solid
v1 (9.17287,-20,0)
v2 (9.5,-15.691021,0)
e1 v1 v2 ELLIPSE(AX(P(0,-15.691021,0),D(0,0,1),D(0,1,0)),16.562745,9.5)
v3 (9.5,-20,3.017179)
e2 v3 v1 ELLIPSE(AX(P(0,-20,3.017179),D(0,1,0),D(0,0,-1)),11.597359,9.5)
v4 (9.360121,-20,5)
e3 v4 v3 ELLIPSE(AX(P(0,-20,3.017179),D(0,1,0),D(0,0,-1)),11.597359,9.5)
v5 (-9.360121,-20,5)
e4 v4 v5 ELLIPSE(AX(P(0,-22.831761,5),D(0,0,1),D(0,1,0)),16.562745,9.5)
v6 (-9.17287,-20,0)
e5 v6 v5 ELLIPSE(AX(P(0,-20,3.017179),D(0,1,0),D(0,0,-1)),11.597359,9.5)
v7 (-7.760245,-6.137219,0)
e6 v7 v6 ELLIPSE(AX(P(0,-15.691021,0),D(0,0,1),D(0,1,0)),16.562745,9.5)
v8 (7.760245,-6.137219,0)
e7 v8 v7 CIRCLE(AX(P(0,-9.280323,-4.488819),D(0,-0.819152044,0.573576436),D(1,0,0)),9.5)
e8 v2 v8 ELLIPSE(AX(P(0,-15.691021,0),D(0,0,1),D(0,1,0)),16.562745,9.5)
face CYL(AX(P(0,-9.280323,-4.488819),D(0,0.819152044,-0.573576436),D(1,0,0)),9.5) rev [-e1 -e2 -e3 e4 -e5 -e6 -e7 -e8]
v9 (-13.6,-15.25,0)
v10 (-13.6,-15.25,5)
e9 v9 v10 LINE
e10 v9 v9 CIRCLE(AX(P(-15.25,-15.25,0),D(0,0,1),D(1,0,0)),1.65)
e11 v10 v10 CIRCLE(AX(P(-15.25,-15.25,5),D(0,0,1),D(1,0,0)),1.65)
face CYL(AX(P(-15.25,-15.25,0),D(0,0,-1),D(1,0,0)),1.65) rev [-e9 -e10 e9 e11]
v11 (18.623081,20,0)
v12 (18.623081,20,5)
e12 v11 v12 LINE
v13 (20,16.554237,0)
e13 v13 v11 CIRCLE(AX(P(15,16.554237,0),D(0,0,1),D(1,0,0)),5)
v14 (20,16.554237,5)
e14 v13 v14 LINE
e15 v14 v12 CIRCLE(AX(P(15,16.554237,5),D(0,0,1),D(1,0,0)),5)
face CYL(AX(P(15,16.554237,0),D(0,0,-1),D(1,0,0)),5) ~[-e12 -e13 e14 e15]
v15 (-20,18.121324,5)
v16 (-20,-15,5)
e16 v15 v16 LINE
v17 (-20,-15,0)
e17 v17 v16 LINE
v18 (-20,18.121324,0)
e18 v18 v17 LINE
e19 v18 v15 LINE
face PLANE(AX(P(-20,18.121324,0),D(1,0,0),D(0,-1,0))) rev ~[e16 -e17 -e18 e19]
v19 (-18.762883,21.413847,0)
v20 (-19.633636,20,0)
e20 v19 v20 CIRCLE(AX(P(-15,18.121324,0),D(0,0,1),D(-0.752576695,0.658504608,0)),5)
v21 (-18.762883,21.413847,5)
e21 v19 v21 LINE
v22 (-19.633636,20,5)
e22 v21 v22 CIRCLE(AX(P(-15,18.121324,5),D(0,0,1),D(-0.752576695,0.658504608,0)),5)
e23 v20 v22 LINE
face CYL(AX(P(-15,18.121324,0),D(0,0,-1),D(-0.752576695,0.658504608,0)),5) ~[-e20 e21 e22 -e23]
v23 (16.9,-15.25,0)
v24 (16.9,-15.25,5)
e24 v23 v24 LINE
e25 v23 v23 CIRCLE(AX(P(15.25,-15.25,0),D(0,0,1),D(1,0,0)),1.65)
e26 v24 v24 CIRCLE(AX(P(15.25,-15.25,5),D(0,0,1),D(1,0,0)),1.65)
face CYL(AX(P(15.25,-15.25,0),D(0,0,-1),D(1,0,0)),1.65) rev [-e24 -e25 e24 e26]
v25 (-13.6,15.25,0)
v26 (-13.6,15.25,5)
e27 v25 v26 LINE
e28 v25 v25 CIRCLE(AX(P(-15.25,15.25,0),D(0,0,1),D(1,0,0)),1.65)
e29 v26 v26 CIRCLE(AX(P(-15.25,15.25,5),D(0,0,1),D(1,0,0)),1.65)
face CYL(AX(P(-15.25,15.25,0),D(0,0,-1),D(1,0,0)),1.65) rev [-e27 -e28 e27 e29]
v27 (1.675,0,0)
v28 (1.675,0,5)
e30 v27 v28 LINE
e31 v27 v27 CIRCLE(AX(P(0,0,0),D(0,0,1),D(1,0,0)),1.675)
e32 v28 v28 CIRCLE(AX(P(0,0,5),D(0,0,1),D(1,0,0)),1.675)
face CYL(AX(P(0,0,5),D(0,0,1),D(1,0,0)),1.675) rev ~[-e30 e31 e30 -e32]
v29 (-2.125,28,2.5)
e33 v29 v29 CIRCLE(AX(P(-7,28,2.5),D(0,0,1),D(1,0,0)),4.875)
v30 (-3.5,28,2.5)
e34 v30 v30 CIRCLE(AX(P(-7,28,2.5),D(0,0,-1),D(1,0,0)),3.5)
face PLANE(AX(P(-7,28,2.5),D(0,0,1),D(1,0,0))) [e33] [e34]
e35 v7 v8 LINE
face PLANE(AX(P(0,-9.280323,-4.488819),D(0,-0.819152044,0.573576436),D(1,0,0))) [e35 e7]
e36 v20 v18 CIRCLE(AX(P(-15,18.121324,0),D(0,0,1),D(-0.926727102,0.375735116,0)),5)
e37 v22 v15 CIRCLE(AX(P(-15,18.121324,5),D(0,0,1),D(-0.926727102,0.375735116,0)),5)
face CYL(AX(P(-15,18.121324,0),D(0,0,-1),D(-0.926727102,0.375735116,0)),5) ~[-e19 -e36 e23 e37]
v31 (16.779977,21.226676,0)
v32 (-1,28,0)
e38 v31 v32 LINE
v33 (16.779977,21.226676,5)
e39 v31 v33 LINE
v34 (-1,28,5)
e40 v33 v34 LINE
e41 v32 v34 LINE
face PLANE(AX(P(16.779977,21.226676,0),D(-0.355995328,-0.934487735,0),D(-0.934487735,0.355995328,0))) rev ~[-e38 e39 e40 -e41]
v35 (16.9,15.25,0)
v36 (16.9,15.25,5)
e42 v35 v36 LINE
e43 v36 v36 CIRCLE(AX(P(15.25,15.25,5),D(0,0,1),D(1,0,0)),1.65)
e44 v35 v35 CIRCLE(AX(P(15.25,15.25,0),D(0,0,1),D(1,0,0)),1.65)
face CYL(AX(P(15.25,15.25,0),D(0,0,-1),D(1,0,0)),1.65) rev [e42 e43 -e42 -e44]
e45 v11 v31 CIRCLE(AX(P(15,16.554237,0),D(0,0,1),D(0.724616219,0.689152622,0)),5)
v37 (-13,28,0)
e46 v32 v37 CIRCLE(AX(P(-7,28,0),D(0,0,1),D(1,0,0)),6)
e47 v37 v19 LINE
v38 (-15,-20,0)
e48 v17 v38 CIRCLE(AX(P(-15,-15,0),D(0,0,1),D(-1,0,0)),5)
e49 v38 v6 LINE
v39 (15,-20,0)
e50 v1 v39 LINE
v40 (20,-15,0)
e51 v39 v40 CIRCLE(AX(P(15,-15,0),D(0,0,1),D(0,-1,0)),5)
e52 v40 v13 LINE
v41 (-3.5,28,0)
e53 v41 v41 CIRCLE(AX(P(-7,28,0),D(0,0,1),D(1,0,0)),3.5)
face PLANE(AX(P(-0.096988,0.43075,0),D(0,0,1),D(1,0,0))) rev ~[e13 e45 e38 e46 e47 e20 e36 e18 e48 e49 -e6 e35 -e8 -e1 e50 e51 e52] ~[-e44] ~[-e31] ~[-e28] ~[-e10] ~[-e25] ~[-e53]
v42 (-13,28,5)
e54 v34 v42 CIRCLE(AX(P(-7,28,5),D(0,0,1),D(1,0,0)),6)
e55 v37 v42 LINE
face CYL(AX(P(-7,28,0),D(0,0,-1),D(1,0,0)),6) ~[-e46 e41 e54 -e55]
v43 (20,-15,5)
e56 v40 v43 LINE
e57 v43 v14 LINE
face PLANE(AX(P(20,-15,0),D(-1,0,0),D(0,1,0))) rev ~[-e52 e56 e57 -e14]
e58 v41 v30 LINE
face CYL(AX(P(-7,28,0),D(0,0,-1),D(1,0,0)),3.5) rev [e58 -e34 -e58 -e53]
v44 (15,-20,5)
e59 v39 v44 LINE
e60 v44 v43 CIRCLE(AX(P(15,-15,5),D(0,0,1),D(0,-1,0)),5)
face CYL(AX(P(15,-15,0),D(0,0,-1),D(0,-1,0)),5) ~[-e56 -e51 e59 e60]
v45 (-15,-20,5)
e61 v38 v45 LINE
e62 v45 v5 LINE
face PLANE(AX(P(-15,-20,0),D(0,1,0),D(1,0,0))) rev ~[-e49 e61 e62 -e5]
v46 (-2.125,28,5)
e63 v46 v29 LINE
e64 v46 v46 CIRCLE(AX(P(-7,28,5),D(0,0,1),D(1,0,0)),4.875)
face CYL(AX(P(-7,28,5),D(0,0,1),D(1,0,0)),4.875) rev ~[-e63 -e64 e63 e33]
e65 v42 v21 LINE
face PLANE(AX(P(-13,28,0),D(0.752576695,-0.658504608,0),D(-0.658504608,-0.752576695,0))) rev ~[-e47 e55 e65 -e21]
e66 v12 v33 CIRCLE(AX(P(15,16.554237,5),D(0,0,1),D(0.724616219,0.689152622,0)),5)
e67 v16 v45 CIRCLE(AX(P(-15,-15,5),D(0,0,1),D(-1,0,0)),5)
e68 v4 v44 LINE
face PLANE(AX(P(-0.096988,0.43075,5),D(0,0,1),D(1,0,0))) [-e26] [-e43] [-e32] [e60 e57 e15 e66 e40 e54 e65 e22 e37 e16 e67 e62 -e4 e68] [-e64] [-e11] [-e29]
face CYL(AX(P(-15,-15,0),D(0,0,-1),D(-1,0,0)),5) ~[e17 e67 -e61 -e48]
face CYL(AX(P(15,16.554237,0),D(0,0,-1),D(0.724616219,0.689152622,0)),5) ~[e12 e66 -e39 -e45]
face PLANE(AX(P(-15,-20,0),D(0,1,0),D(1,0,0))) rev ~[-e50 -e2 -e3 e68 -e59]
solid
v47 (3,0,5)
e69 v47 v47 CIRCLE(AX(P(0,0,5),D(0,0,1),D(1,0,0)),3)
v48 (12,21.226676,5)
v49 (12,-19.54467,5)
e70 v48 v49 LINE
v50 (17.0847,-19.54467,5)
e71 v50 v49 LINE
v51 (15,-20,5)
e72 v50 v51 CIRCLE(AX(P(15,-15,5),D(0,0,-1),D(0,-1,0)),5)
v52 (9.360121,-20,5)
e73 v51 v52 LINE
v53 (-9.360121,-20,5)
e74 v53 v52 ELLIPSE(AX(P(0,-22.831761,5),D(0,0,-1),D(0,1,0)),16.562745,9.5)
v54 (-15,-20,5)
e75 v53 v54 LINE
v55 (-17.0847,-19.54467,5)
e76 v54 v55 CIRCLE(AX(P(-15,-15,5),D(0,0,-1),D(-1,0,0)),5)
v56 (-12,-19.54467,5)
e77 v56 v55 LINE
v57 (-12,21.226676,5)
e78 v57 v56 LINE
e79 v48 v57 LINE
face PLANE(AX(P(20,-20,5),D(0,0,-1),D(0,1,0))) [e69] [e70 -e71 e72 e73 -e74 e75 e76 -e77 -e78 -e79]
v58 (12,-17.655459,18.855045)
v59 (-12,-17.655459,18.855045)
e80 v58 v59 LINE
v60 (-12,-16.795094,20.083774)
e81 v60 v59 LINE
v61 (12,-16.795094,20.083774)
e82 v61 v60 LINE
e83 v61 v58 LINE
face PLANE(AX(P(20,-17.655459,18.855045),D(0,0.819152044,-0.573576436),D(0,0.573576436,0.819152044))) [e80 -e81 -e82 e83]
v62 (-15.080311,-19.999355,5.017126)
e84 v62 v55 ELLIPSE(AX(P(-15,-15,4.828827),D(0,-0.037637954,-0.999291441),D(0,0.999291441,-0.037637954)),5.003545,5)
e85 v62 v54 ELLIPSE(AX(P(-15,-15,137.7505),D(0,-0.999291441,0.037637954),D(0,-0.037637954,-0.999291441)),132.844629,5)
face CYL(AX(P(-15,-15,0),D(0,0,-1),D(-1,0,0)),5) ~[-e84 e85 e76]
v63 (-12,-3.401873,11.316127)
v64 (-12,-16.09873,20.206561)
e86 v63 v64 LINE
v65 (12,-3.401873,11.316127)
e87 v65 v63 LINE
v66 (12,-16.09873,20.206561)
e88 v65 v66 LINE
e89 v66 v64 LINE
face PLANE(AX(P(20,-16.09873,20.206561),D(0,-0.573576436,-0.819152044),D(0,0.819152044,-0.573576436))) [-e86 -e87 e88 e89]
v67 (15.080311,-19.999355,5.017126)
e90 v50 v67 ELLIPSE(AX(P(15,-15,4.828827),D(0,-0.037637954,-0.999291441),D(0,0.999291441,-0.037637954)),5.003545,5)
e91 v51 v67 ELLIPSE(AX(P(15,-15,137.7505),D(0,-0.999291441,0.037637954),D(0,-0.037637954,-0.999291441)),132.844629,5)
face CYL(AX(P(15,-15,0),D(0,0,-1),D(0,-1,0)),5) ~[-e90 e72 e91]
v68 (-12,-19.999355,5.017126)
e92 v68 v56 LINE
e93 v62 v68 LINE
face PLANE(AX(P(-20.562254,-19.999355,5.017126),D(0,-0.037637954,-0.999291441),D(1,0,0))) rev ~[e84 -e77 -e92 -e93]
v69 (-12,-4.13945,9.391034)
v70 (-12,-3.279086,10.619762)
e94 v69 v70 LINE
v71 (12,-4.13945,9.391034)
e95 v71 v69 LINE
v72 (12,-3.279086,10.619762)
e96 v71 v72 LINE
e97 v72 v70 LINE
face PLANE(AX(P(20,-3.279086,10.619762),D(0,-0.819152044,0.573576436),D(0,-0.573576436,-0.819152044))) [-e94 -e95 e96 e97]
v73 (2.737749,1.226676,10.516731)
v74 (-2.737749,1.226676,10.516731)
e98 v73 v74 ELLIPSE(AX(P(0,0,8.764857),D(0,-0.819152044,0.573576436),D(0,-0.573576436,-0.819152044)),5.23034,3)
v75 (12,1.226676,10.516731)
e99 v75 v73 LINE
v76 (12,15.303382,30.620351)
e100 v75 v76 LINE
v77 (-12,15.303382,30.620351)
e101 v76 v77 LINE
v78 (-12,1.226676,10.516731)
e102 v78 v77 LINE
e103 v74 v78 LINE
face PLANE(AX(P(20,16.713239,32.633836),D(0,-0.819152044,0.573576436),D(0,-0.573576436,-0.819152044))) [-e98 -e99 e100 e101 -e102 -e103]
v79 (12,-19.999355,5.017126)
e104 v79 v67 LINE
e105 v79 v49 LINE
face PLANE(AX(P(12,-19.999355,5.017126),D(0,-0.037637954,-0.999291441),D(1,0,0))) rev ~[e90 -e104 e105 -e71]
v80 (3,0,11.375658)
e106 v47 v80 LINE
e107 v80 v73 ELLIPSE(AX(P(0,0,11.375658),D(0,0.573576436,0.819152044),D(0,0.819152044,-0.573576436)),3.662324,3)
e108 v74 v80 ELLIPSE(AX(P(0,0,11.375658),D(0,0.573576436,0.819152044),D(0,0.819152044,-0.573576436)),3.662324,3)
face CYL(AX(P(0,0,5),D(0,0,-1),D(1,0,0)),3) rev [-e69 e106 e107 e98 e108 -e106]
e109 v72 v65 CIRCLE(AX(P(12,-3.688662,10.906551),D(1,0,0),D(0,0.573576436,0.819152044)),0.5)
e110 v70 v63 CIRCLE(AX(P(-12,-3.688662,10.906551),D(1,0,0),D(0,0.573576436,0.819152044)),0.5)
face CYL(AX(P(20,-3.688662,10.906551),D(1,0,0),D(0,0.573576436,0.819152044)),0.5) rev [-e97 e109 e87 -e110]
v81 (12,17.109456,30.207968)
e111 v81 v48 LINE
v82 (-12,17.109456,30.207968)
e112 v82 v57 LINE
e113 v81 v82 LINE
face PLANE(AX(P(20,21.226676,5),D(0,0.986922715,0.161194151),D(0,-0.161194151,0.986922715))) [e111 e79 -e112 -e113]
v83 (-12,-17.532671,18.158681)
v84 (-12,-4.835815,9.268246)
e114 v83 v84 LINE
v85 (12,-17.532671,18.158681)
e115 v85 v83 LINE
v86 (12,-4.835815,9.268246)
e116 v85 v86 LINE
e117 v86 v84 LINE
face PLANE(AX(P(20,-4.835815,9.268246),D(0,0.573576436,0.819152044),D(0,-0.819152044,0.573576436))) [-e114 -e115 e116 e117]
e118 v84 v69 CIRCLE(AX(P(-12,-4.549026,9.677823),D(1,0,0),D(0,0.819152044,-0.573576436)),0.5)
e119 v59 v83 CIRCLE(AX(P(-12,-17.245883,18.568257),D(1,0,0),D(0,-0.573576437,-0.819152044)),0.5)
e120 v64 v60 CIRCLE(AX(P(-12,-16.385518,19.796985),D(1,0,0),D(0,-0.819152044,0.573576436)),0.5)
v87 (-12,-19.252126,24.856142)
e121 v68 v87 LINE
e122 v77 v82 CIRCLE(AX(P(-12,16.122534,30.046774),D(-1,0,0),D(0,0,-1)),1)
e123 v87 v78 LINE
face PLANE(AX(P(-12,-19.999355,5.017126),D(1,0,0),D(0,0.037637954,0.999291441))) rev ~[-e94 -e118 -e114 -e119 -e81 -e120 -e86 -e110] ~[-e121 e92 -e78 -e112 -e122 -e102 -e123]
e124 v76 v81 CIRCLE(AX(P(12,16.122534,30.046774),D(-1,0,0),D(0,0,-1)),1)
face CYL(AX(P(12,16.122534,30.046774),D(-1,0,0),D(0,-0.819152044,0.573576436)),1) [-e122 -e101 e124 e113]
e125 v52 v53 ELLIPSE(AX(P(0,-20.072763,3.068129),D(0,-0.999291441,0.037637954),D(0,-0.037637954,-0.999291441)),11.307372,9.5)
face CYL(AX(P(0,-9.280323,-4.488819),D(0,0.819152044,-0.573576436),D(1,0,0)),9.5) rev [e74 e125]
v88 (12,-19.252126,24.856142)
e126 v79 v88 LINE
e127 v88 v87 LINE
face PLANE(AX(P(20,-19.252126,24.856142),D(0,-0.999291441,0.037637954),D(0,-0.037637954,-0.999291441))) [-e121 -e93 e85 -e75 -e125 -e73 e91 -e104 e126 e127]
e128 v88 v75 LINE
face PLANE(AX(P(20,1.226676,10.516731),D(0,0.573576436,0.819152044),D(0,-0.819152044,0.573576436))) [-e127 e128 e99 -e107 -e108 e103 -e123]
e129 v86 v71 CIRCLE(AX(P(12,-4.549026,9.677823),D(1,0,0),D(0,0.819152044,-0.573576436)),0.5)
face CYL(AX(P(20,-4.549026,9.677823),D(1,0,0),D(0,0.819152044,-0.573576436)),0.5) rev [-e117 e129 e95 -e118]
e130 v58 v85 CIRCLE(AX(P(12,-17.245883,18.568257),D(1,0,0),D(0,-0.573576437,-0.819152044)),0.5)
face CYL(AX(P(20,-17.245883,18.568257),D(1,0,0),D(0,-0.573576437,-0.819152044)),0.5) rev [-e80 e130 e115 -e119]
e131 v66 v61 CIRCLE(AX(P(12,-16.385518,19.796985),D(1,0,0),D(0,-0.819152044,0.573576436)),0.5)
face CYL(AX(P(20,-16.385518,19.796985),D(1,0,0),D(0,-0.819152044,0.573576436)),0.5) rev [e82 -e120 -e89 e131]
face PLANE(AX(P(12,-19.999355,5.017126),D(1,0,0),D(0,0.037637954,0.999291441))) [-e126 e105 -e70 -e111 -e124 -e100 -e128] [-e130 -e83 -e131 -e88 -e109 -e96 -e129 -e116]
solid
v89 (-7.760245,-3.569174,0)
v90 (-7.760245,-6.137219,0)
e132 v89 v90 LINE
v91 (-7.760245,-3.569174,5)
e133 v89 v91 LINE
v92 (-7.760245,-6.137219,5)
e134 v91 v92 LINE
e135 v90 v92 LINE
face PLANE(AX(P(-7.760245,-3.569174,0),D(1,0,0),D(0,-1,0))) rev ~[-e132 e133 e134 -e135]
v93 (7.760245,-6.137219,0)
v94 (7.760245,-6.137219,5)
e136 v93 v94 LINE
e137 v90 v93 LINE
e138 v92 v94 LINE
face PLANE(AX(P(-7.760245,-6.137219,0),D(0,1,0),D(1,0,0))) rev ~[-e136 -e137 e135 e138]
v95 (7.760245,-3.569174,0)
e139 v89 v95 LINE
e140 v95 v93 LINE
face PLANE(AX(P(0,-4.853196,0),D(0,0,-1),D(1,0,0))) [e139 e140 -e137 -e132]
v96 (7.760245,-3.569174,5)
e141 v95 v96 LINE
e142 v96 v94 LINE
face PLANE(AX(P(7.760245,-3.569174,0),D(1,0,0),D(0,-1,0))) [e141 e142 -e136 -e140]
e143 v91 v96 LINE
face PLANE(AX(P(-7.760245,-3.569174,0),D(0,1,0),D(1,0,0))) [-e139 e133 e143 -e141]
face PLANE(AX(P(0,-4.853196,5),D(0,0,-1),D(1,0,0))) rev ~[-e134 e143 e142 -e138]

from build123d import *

# Parameters (mm, degrees)
F0_R          = 1.65
F0_R_2        = 3.5
F1_DEPTH      = 5
F3_DEPTH      = 40
F4_R          = 9.5
F5_DEPTH      = 25
F6_R          = 1.675
F7_DEPTH      = 25
F7_DEPTH_BACK = 25
F8_R          = 3
F9_DEPTH      = 40
F11_DEPTH     = 40
F12_W         = 9.1582505405
F12_H         = 40
F12_W_2       = 8.5622543842
F13_DEPTH     = 50
F14_R         = 1
F15_R         = 4.875
F16_DEPTH     = 2.5
F17_W         = 15.5204893433
F17_H         = 2.5680447786
F18_DEPTH     = 5


with BuildPart() as f1:
    # F0 (on Top) → F1 (new body)
    with BuildSketch(Plane.XY):
        with BuildLine():
            Line((-15, -20), (15, -20))
            ThreePointArc((15, -20), (18.5355339059, -18.5355339059), (20, -15))
            Line((20, -15), (20, 16.5542368918))
            ThreePointArc((20, 16.5542368918), (19.643027324, 18.4095797898), (18.6230810925, 20))
            Line((18.6230810925, 20), (-19.6336355125, 20))
            ThreePointArc((-19.6336355125, 20), (-19.9075542566, 19.078356926), (-20, 18.1213244195))
            Line((-20, 18.1213244195), (-20, -15))
            ThreePointArc((-20, -15), (-18.5355339059, -18.5355339059), (-15, -20))
        make_face()
        with Locations((-15.25, -15.25)):
            Circle(F0_R, mode=Mode.SUBTRACT)
        with Locations((15.25, -15.25)):
            Circle(F0_R, mode=Mode.SUBTRACT)
        with Locations((-15.25, 15.25)):
            Circle(F0_R, mode=Mode.SUBTRACT)
        with Locations((15.25, 15.25)):
            Circle(F0_R, mode=Mode.SUBTRACT)
        with BuildLine():
            Line((-19.6336355125, 20), (18.6230810925, 20))
            ThreePointArc((18.6230810925, 20), (17.7702782254, 20.7166350653), (16.779976638, 21.2266755665))
            Line((16.779976638, 21.2266755665), (-1, 28))
            ThreePointArc((-1, 28), (-7, 22), (-13, 28))
            Line((-13, 28), (-18.7628834735, 21.4138474588))
            ThreePointArc((-18.7628834735, 21.4138474588), (-19.2573611463, 20.7433229072), (-19.6336355125, 20))
        make_face()
        with BuildLine():
            ThreePointArc((-13, 28), (-7, 22), (-1, 28))
            ThreePointArc((-1, 28), (-7, 34), (-13, 28))
        make_face()
        with Locations((-7, 28)):
            Circle(F0_R_2, mode=Mode.SUBTRACT)
    extrude(amount=F1_DEPTH)


with BuildPart() as f3:
    # F2 (on face) → F3 (new body)
    with BuildSketch(Plane.YZ.offset(20)):
        Polygon((1.2266755665, 10.51673083), (-19.2521255407, 24.8561417388), (-20, 5), (21.2266755665, 5), (16.713239348, 32.6338360258), align=None)
        with BuildLine():
            ThreePointArc((-16.7950944212, 20.0837735554), (-16.4723424879, 20.2893892137), (-16.0987301809, 20.2065613594))
            Line((-16.0987301809, 20.2065613594), (-3.4018734944, 11.3161265959))
            ThreePointArc((-3.4018734944, 11.3161265959), (-3.1962578361, 10.9933746626), (-3.2790856905, 10.6197623556))
            Line((-3.2790856905, 10.6197623556), (-4.139450345, 9.3910342892))
            ThreePointArc((-4.139450345, 9.3910342892), (-4.4622022783, 9.1854186308), (-4.8358145853, 9.2682464852))
            Line((-4.8358145853, 9.2682464852), (-17.5326712718, 18.1586812486))
            ThreePointArc((-17.5326712718, 18.1586812486), (-17.7382869301, 18.481433182), (-17.6554590758, 18.855045489))
            Line((-17.6554590758, 18.855045489), (-16.7950944212, 20.0837735554))
        make_face(mode=Mode.SUBTRACT)
    extrude(amount=-F3_DEPTH)


with BuildPart() as f5_tool:
    # F4 (on face) → F5 (new body)
    with BuildSketch(Plane(origin=(0, -4.1181355181, 2.8835495331), x_dir=(1, 0, 0), z_dir=(0, -0.8191520443, 0.5735764364))):
        with Locations((0, -9)):
            Circle(F4_R)
    extrude(amount=F5_DEPTH)


with BuildPart() as f1_1:
    add(f1.part)

    # F5: cut by f5_tool
    add(f5_tool.part, mode=Mode.SUBTRACT)


with BuildPart() as f3_1:
    add(f3.part)

    # F5: cut by f5_tool
    add(f5_tool.part, mode=Mode.SUBTRACT)


with BuildPart() as f7_tool:
    # F6 (on face) → F7 (new body, two sides)
    with BuildSketch(Plane.XY.offset(5)) as f7_sk:
        Circle(F6_R)
    extrude(amount=F7_DEPTH)
    extrude(f7_sk.sketch, amount=-F7_DEPTH_BACK)


with BuildPart() as f1_2:
    add(f1_1.part)

    # F7: cut by f7_tool
    add(f7_tool.part, mode=Mode.SUBTRACT)

    # F15 (on face) → F16 (cut)
    with BuildSketch(Plane.XY.offset(5)):
        with Locations((-7, 28)):
            Circle(F15_R)
    extrude(amount=-F16_DEPTH, mode=Mode.SUBTRACT)


with BuildPart() as f3_2:
    add(f3_1.part)

    # F7: cut by f7_tool
    add(f7_tool.part, mode=Mode.SUBTRACT)

    # F8 (on face) → F9 (cut)
    with BuildSketch(Plane.XY.offset(5)):
        with Locations((-15.25, -15.25)):
            Circle(F8_R)
        with Locations((-15.25, 15.25)):
            Circle(F8_R)
        with Locations((15.25, 15.25)):
            Circle(F8_R)
        with Locations((15.25, -15.25)):
            Circle(F8_R)
        Circle(F8_R)
    extrude(amount=F9_DEPTH, mode=Mode.SUBTRACT)

    # F10 (on face) → F11 (cut)
    with BuildSketch(Plane(origin=(0, 0, 0), x_dir=(1, 0, 0), z_dir=(0, 0, -1))):
        with BuildLine():
            ThreePointArc((-20, 15), (-18.5355339059, 18.5355339059), (-15, 20))
            Line((-15, 20), (-18.4092409909, 22.2686175257))
            Line((-18.4092409909, 22.2686175257), (-22.4427245557, 20.613854751))
            Line((-22.4427245557, 20.613854751), (-20, 15))
        make_face()
        with BuildLine():
            Line((15.3065547347, 23.8199587911), (15, 20))
            ThreePointArc((15, 20), (18.5355339059, 18.5355339059), (20, 15))
            Line((20, 15), (20, 23.8199587911))
            Line((20, 23.8199587911), (15.3065547347, 23.8199587911))
        make_face()
    extrude(amount=-F11_DEPTH, mode=Mode.SUBTRACT)

    # F12 (on face) → F13 (cut)
    with BuildSketch(Plane(origin=(0, -20.1597241143, 0.7593087806), x_dir=(1, 0, 0), z_dir=(0, -0.9992914412, 0.0376379538))):
        with Locations((16.5791252702, 24.2608358153)):
            Rectangle(F12_W, F12_H)
        with Locations((-16.2811271921, 24.2608358153)):
            Rectangle(F12_W_2, F12_H)
    extrude(amount=-F13_DEPTH, mode=Mode.SUBTRACT)

    # F14
    f14_edges = [f3_2.edges().sort_by_distance(p)[0] for p in [
        (0, 16.713239, 32.633836),
    ]]
    fillet(f14_edges, radius=F14_R)


with BuildPart() as f18:
    # F17 (on face) → F18 (new body)
    with BuildSketch(Plane(origin=(0, 0, 0), x_dir=(1, 0, 0), z_dir=(0, 0, -1))):
        with Locations((0, 4.8531962487)):
            Rectangle(F17_W, F17_H)
    extrude(amount=-F18_DEPTH)


solid = Compound([f1_2.part, f3_2.part, f18.part])
